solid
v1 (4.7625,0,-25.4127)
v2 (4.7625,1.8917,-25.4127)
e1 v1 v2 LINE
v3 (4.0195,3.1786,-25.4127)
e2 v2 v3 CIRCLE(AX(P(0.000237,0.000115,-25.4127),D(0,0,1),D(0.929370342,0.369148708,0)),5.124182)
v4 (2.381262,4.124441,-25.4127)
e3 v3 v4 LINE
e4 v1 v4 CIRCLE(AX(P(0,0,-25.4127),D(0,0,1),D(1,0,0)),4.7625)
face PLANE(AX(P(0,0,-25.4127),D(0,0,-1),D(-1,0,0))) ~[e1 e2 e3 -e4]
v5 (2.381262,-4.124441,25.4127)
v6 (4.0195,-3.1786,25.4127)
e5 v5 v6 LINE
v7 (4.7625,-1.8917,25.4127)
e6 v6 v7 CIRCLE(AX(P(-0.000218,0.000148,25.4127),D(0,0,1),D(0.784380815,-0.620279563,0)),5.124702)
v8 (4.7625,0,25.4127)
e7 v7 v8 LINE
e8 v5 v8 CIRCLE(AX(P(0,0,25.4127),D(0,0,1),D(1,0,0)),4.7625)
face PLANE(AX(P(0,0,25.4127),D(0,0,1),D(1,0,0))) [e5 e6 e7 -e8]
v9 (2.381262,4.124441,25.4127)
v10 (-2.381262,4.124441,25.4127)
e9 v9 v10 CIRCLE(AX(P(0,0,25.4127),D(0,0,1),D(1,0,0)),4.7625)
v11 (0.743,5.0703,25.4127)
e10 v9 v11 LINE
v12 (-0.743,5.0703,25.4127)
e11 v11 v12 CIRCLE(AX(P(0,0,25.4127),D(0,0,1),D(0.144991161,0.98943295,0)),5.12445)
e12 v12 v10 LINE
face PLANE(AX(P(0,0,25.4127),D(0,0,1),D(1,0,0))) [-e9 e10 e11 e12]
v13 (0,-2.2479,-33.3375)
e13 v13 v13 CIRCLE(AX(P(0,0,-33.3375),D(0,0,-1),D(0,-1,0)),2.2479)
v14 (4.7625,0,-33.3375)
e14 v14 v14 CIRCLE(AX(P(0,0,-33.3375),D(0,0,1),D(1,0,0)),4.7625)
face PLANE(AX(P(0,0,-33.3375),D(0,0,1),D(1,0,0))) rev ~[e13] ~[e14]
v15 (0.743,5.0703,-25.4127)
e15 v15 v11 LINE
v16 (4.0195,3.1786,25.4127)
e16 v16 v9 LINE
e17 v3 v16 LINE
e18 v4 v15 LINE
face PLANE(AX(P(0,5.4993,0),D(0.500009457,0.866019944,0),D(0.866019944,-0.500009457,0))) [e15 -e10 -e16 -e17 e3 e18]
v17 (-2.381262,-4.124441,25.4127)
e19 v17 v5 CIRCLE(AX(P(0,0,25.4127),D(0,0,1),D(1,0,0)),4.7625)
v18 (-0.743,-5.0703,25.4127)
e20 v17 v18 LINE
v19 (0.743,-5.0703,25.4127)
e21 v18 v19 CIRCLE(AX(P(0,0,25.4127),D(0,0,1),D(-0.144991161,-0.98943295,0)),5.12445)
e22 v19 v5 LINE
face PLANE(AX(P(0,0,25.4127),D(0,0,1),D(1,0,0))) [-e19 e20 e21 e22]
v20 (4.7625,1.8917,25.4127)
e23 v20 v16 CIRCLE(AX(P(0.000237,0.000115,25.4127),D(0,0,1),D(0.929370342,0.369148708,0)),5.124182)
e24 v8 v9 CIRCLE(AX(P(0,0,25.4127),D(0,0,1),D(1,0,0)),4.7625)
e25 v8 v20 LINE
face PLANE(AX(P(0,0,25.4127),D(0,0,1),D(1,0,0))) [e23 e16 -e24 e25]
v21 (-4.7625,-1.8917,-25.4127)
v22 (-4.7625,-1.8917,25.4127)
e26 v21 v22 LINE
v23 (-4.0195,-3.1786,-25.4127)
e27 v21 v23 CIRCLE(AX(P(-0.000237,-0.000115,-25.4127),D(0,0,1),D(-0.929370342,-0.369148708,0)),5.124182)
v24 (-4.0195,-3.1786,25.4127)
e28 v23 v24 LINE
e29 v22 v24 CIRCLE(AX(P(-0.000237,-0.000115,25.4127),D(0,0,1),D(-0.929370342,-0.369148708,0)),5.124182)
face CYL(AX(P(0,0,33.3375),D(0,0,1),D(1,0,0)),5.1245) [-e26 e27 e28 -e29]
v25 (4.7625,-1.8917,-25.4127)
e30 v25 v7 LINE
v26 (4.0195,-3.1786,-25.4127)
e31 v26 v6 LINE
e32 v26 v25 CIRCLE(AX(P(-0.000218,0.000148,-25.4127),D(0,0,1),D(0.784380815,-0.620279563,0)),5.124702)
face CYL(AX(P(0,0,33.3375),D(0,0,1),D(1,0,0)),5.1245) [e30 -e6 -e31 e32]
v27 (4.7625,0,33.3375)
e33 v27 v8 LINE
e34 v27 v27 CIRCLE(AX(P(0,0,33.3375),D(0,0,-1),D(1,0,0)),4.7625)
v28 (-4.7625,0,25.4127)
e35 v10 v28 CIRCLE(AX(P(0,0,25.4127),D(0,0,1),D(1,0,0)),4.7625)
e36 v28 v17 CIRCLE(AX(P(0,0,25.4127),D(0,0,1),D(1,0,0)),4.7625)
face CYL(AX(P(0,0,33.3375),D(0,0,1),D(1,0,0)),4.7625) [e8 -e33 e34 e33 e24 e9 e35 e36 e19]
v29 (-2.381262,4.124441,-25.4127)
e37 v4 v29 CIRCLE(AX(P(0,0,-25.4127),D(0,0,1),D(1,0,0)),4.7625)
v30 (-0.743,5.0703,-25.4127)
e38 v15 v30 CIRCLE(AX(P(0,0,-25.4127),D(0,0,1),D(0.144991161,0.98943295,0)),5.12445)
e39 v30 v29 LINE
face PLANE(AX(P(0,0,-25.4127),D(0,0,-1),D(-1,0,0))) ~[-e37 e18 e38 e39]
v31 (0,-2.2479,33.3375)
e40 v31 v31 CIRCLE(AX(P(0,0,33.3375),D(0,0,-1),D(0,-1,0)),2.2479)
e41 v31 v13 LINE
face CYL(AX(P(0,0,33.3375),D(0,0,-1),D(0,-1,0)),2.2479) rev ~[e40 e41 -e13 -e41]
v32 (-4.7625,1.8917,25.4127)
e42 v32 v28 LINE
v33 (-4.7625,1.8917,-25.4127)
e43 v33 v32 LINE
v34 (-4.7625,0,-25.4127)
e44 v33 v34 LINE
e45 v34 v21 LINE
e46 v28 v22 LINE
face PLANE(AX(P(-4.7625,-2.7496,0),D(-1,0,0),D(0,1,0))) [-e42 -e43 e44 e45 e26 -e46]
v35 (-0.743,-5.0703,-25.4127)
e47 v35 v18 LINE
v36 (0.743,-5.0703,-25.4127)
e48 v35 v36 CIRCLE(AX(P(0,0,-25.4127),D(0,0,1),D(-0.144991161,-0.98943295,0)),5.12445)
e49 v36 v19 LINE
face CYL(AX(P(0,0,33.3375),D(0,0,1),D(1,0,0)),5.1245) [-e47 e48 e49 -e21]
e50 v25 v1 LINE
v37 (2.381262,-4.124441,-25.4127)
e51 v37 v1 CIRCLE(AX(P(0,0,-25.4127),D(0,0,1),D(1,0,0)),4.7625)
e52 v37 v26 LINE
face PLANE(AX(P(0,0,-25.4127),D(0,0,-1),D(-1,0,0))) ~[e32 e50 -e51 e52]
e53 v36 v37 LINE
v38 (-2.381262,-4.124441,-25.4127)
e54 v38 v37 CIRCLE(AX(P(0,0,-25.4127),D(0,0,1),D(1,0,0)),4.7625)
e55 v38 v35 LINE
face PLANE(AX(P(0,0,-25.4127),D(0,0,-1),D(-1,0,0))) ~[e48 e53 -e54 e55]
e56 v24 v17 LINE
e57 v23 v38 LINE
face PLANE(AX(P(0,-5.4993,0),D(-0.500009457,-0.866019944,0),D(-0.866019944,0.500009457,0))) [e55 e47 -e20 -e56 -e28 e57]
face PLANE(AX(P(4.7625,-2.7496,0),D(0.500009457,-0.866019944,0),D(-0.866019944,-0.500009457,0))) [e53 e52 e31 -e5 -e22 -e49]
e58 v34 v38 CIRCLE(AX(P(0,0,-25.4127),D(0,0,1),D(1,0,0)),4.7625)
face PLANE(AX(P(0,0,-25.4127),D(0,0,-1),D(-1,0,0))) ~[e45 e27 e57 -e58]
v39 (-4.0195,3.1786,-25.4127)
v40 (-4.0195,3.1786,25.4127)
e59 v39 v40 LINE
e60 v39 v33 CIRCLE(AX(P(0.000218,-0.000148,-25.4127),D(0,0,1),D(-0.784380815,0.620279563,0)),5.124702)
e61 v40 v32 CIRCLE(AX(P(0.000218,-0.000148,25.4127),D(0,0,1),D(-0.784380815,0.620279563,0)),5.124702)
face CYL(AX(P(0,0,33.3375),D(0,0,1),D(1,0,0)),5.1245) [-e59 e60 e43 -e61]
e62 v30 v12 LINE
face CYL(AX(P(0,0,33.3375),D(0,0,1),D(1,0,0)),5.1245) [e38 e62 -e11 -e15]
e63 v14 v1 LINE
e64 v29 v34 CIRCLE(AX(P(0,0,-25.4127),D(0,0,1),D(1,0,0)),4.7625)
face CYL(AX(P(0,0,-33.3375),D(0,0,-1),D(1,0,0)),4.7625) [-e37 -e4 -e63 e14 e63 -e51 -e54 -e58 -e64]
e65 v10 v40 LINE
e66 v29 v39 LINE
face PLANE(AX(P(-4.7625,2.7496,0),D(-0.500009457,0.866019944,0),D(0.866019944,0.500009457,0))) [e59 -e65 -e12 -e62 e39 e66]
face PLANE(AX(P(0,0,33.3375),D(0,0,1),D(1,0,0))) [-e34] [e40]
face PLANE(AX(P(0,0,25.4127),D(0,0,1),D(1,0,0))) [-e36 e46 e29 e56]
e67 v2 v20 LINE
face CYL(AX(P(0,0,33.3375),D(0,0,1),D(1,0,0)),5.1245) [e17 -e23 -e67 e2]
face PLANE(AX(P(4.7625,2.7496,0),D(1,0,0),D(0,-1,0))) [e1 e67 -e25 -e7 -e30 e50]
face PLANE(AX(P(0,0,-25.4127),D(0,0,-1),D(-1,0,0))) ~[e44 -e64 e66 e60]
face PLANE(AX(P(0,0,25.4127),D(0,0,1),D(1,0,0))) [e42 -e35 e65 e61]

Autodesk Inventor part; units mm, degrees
ref_plane "YZ Plane" through (0, 0, 0) normal (1, 0, 0) x (0, 1, 0)
ref_plane "XZ Plane" through (0, 0, 0) normal (0, 1, 0) x (-1, 0, 0)
ref_plane "XY Plane" through (0, 0, 0) normal (0, 0, 1) x (1, 0, 0)
sketch "Sketch1" plane through (0, 0, 0) normal (0, 0, 1) x (1, 0, 0)
  line L0 (-4.7625, -2.7496) -> (-4.7625, 2.7496)
  line L1 (-4.7625, 2.7496) -> (0, 5.4993)
  line L2 (0, 5.4993) -> (4.7625, 2.7496)
  line L3 (4.7625, 2.7496) -> (4.7625, -2.7496)
  line L4 (4.7625, -2.7496) -> (0, -5.4993)
  line L5 (0, -5.4993) -> (-4.7625, -2.7496)
  point P0 (0, 0)
  point P1 (0, 0)
  dimension "Size" = 9.525
extrude "Extrusion1" add sketch "Sketch1" along normal mid plane 66.675
sketch "Sketch3" plane through (0, 0, 33.3375) normal (0, 0, 1) x (1, 0, 0)
  line L0 (-4.7625, 2.7496) -> (0, 5.4993) construction
  line L1 (0, 5.4993) -> (4.7625, 2.7496) construction
  line L2 (4.7625, 2.7496) -> (4.7625, -2.7496) construction
  line L3 (4.7625, -2.7496) -> (0, -5.4993) construction
  line L4 (0, -5.4993) -> (-4.7625, -2.7496) construction
  line L5 (-4.7625, -2.7496) -> (-4.7625, 2.7496) construction
  point P0 (0, 0)
hole "Hole1" at (0, 0, 33.3375) direction (0, 0, -1) diameter 4.4958 end through all
sketch "Sketch4" plane through (0, 0, 33.3375) normal (0, 0, 1) x (1, 0, 0)
  circle A0 centre (0, 0) radius 2.2479 construction
  line L0 (-4.7625, 2.7496) -> (0, 5.4993) construction
  line L1 (0, 5.4993) -> (4.7625, 2.7496) construction
  line L2 (4.7625, 2.7496) -> (4.7625, -2.7496) construction
  line L3 (4.7625, -2.7496) -> (0, -5.4993) construction
  line L4 (0, -5.4993) -> (-4.7625, -2.7496) construction
  line L5 (-4.7625, -2.7496) -> (-4.7625, 2.7496) construction
  circle A1 centre (0, 0) radius 5.1245
  circle A2 centre (0, 0) radius 8.89
  dimension "thunder" = 10.2489
  dimension "d16" = 17.78
extrude "Extrusion3" cut sketch "Sketch4" against normal through all
sketch "Sketch5" plane through (0, 0, 33.3375) normal (0, 0, 1) x (1, 0, 0)
  circle A0 centre (0, 0) radius 2.2479 projected
  circle A1 centre (0, 0) radius 4.7625
  line L0 (4.7625, -1.8917) -> (4.7625, 1.8917) projected
  line L1 (4.0195, 3.1786) -> (0.743, 5.0703) projected
  line L2 (-0.743, 5.0703) -> (-4.0195, 3.1786) projected
  line L3 (-4.7625, 1.8917) -> (-4.7625, -1.8917) projected
  line L4 (-4.0195, -3.1786) -> (-0.743, -5.0703) projected
  line L5 (0.743, -5.0703) -> (4.0195, -3.1786) projected
  circle A2 centre (0, 0) radius 2.2479 projected
  arc A3 (4.0195, -3.1786) -> (4.7625, -1.8917) centre (0, 0) ccw projected
  arc A4 (4.7625, 1.8917) -> (4.0195, 3.1786) centre (0, 0) ccw projected
  arc A5 (0.743, 5.0703) -> (-0.743, 5.0703) centre (0, 0) ccw projected
  arc A6 (-4.0195, 3.1786) -> (-4.7625, 1.8917) centre (0, 0) ccw projected
  arc A7 (-4.7625, -1.8917) -> (-4.0195, -3.1786) centre (0, 0) ccw projected
  arc A8 (-0.743, -5.0703) -> (0.743, -5.0703) centre (0, 0) ccw projected
  point P0 (2.3813, -4.1244)
  point P1 (-2.3813, -4.1244)
  point P2 (-4.7625, 0)
  point P3 (-2.3813, 4.1244)
  point P4 (2.3812, 4.1244)
  point P5 (4.7625, 0)
  dimension "d21" = 9.525
extrude "Extrusion4" cut sketch "Sketch5" against normal blind 7.9248 contours L0 A3 L5 A1 | A1 L1 A4 L0 | A1 L2 A5 L1 | L5 A8 L4 A1 | A1 L3 A6 L2 | L4 A7 L3 A1
mirror "Mirror2" about plane through (0, 0, 0) normal (0, 0, 1) of "Extrusion4"
equation "\"bearing\" = 25.4"
properties part number "GP10-008" material "Aluminum 6061"
